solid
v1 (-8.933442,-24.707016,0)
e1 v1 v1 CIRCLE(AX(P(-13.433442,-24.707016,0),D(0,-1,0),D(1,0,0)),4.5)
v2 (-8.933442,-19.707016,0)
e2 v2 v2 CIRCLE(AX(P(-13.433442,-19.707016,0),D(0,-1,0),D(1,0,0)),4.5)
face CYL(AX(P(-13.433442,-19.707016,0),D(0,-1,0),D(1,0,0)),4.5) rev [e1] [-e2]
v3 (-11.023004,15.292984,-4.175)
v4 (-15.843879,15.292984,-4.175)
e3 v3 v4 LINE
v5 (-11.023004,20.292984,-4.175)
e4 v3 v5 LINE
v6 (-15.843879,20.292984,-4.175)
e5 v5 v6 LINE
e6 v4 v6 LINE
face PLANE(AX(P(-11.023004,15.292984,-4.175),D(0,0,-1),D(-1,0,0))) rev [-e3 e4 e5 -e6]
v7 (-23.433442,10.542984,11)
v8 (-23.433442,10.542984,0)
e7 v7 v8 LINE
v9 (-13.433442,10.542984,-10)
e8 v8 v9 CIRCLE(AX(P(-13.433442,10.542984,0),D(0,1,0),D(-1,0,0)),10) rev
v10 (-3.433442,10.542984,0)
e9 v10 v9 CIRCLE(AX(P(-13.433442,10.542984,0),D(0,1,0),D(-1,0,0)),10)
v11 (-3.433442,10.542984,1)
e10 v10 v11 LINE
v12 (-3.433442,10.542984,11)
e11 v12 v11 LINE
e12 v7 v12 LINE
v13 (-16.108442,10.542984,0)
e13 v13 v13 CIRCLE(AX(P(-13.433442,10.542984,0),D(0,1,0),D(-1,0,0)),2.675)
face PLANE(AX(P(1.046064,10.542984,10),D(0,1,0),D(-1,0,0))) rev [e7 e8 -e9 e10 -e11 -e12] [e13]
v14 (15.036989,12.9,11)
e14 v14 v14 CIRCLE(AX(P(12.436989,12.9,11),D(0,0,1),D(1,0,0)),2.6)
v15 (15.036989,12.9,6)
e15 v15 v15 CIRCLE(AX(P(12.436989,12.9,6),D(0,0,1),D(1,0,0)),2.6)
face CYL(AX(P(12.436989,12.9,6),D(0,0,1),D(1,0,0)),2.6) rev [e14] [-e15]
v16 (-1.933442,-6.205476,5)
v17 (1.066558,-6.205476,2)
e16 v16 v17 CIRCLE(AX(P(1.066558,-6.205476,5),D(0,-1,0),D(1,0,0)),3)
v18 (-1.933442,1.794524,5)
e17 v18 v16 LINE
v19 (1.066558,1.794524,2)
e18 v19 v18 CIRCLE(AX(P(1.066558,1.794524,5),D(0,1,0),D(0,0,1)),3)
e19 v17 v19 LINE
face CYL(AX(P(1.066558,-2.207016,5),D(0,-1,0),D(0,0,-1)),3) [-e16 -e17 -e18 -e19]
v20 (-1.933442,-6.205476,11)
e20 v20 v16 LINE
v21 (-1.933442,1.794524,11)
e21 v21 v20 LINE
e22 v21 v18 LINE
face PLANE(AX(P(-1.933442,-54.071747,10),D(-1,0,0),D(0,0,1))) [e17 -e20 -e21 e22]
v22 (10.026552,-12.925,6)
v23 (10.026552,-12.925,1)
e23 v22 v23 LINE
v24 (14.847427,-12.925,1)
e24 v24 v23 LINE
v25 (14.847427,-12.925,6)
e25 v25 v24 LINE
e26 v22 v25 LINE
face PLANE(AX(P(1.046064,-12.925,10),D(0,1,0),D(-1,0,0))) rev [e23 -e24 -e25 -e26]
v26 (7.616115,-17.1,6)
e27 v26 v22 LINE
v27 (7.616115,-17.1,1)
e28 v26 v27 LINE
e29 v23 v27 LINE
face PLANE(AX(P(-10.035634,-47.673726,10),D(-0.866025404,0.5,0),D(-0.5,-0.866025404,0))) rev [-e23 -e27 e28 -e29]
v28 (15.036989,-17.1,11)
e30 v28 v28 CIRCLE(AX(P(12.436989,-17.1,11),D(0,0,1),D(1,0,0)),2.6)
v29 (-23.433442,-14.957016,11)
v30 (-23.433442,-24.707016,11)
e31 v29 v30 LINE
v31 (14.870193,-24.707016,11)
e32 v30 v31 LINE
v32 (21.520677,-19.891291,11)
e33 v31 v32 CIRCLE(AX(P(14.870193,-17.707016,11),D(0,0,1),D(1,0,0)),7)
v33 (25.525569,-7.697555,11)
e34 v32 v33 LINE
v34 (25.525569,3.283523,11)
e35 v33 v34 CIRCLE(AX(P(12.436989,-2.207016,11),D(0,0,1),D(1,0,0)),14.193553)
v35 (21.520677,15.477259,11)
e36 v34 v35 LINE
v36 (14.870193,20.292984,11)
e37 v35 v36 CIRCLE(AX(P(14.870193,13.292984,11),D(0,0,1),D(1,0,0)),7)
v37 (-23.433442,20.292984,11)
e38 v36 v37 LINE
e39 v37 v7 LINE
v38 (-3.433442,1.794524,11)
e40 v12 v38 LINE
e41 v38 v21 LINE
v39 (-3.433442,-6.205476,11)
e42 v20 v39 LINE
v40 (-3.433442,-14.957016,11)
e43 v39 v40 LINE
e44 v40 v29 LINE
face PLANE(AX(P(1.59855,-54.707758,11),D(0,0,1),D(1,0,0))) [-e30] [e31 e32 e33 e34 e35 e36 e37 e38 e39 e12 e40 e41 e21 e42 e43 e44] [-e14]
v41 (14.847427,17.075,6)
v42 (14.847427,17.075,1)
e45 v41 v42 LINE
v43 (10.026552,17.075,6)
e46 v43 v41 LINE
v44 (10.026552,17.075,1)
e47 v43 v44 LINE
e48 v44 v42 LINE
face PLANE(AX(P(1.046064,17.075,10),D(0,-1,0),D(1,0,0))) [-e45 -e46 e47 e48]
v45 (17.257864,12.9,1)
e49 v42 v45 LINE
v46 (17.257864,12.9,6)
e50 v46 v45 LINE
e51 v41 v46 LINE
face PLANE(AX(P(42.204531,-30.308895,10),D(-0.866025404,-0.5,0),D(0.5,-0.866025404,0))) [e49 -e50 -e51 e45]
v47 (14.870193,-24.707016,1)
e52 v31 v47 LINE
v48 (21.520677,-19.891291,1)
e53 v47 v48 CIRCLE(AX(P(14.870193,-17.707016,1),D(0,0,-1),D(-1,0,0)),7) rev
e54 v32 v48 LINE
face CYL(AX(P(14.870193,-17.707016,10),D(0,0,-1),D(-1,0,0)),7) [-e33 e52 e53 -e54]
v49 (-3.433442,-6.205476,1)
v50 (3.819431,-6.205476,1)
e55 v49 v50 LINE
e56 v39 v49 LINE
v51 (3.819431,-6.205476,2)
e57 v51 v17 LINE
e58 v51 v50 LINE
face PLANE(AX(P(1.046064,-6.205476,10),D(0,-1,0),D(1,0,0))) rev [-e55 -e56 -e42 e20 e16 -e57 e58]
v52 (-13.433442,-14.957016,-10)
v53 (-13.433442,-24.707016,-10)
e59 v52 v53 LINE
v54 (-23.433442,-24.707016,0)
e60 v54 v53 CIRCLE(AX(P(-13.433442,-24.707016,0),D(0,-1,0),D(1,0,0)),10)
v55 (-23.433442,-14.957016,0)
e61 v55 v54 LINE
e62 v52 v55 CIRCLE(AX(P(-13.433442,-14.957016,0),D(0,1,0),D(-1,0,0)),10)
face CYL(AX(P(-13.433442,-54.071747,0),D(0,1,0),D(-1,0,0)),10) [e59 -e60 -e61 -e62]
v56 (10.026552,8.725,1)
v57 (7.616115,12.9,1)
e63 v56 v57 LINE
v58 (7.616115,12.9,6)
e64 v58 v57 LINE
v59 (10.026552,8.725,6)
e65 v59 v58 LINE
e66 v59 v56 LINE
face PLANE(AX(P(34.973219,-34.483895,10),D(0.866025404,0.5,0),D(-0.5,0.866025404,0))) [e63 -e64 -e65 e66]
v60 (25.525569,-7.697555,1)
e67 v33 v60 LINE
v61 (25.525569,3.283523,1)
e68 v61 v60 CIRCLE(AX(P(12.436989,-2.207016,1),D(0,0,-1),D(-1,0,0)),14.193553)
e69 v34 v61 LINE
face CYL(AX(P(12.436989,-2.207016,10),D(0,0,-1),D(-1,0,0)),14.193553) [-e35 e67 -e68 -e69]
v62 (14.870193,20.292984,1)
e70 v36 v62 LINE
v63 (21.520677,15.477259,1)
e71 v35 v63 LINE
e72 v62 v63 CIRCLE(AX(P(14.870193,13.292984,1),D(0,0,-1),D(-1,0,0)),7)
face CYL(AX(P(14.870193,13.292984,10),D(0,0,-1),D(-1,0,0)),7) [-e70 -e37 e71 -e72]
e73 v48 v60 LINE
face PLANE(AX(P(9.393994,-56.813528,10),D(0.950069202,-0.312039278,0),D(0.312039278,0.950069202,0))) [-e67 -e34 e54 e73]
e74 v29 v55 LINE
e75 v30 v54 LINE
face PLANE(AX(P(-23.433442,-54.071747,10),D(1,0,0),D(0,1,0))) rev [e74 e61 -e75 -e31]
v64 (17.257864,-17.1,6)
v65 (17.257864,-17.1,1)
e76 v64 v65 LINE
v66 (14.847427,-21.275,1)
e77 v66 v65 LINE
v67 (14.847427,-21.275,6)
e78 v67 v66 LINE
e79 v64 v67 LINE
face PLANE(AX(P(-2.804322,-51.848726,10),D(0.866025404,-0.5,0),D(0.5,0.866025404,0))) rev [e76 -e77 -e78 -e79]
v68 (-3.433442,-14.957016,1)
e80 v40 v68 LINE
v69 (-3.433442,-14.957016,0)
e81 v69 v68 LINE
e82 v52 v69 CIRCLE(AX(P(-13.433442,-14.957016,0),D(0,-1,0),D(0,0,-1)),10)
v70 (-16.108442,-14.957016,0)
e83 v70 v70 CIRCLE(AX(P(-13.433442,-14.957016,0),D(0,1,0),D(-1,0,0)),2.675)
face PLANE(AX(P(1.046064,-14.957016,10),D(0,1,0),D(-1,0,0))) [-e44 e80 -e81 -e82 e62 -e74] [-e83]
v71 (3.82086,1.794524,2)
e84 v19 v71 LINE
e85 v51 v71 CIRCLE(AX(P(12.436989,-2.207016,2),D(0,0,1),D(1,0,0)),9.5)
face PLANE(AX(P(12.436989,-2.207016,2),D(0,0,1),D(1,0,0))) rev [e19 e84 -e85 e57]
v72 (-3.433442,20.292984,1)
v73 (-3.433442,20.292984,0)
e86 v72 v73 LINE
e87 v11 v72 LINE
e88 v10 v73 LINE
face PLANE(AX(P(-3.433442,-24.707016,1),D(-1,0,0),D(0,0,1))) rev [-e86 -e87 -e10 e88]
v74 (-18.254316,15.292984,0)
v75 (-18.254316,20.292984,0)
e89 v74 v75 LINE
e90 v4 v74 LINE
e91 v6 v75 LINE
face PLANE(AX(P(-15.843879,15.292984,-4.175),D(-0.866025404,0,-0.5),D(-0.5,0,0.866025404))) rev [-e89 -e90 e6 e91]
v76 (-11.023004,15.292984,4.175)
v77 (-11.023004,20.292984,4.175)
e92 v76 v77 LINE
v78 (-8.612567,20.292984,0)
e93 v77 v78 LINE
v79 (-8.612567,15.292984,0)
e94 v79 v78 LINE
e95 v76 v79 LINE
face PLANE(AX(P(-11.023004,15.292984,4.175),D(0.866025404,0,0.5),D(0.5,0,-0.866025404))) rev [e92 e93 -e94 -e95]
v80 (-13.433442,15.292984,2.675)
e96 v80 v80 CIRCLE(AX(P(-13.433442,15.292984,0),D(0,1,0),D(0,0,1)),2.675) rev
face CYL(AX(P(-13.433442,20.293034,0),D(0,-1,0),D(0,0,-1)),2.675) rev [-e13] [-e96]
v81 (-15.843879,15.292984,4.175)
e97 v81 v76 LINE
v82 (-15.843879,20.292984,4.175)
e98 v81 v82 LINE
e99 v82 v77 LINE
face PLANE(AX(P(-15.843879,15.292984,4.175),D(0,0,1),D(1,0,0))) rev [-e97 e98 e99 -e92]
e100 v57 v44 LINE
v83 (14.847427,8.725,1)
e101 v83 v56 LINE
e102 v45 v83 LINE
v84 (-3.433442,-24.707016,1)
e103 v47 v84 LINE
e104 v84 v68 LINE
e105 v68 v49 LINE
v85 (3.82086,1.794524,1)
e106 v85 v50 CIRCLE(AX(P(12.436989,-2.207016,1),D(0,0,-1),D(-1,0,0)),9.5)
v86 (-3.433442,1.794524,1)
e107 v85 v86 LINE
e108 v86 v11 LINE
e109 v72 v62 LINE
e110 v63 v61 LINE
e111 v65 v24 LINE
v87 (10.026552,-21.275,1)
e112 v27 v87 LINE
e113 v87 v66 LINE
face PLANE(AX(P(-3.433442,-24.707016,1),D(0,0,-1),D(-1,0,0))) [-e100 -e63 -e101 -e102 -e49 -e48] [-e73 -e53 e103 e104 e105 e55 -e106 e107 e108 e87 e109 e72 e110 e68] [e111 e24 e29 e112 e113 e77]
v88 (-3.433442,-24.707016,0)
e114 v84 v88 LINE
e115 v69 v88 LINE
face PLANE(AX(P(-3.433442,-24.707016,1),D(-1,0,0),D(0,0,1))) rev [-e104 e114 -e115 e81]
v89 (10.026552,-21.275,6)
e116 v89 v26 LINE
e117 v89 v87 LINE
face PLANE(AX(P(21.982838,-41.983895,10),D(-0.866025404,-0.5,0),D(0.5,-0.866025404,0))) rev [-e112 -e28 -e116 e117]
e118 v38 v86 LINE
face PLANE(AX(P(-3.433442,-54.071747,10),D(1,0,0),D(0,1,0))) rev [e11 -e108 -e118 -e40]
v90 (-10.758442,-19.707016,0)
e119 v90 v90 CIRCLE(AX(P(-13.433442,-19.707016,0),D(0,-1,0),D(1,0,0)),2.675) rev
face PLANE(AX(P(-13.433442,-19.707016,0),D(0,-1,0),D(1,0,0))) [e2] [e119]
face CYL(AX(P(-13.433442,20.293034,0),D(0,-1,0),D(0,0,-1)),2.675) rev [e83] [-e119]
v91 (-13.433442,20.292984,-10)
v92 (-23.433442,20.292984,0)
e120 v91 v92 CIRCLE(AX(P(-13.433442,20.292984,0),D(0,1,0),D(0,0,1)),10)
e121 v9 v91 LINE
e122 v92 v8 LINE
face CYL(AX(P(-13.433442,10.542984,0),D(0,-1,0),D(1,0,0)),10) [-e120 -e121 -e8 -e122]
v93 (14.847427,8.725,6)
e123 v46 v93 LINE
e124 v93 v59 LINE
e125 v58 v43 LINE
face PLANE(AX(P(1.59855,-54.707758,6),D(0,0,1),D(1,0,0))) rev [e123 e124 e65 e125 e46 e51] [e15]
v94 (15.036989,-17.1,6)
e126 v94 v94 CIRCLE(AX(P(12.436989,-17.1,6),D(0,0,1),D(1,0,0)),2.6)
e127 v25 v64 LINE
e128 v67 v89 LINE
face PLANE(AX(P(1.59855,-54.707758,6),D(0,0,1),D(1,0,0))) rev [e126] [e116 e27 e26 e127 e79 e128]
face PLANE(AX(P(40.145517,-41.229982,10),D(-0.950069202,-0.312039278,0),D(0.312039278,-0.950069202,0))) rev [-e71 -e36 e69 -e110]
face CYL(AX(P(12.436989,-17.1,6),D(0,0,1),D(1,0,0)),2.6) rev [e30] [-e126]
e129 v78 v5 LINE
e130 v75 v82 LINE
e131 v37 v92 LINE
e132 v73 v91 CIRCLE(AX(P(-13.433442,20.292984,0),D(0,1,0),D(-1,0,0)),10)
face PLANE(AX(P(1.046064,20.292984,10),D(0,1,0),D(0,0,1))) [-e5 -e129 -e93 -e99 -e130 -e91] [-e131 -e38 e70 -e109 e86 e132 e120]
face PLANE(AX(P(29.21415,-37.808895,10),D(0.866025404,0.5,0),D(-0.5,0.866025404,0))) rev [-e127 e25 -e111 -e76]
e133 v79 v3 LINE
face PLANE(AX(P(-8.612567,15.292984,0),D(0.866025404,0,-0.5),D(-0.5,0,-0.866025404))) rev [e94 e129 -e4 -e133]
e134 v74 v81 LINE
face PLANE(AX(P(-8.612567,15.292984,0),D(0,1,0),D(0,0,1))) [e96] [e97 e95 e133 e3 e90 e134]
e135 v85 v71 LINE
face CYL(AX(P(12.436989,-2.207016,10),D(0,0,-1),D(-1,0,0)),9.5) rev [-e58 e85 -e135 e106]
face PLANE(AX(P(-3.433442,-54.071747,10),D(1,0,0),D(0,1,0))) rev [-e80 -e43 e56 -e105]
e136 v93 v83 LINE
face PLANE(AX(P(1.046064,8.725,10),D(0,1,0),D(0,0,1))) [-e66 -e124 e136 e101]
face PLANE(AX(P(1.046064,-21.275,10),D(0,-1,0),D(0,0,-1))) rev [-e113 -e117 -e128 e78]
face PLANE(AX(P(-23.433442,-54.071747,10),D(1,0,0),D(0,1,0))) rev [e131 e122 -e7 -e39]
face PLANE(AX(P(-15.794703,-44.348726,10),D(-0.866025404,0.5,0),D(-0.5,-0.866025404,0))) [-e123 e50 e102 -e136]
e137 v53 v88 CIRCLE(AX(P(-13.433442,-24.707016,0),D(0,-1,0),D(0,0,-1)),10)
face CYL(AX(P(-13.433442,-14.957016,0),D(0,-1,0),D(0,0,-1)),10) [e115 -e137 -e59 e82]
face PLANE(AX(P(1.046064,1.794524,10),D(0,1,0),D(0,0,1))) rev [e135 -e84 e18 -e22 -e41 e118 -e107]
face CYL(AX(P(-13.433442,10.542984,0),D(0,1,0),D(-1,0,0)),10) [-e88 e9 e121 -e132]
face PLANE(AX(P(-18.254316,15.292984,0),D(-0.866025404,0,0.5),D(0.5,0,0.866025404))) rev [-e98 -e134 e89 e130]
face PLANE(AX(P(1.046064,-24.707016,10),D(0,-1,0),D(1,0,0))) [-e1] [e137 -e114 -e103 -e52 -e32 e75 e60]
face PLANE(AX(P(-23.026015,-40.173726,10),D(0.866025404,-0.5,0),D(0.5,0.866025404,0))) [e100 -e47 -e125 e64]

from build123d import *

# Parameters (mm, degrees)
SKETCH1_R           = 9.5
BOSS_EXTRUDE1_DEPTH = 10
BOSS_EXTRUDE4_START = -9.75
BOSS_EXTRUDE4_DEPTH = 9.75
BOSS_EXTRUDE5_DEPTH = 9.75
SKETCH19_R          = 2.675
CUT_EXTRUDE1_DEPTH  = 54.237071403
CUT_EXTRUDE2_DEPTH  = 1
SKETCH21_R          = 9.541498329
BOSS_EXTRUDE6_DEPTH = 8
SKETCH22_W          = 10.184582577
SKETCH22_H          = 8
CUT_EXTRUDE3_DEPTH  = 1
SKETCH24_R          = 2.6
BOSS_EXTRUDE8_DEPTH = 1
SKETCH25_R          = 2.6
BOSS_EXTRUDE9_DEPTH = 5
SKETCH26_R          = 4.5
CUT_EXTRUDE4_DEPTH  = 5
CUT_EXTRUDE5_DEPTH  = 5
FILLET1_R           = 3
FILLET2_R           = 10


with BuildPart() as part:
    # Sketch1 → Boss-Extrude1 (new body)
    with BuildSketch(Plane.XY):
        with BuildLine():
            Line((-23.433441641, -14.957015859), (-23.433441641, -24.707015859))
            Line((-23.433441641, -24.707015859), (14.870192677, -24.707015859))
            ThreePointArc((14.870192677, -24.707015859), (18.975681404, -23.376668609), (21.520677092, -19.891290805))
            Line((21.520677092, -19.891290805), (25.525569024, -7.69755511))
            ThreePointArc((25.525569024, -7.69755511), (26.630542081, -2.207015859), (25.525569024, 3.283523393))
            Line((25.525569024, 3.283523393), (21.520677092, 15.477259087))
            ThreePointArc((21.520677092, 15.477259087), (18.975681404, 18.962636892), (14.870192677, 20.292984141))
            Line((14.870192677, 20.292984141), (-23.433441641, 20.292984141))
            Line((-23.433441641, 20.292984141), (-23.433441641, 10.542984141))
            Line((-23.433441641, 10.542984141), (-3.433441641, 10.542984141))
            Line((-3.433441641, 10.542984141), (-3.433441641, 1.794523598))
            Line((-3.433441641, 1.794523598), (-1.933441641, 1.794523598))
            Line((-1.933441641, 1.794523598), (-1.933441641, -6.205476402))
            Line((-1.933441641, -6.205476402), (-3.433441641, -6.205476402))
            Line((-3.433441641, -6.205476402), (-3.433441641, -14.957015859))
            Line((-3.433441641, -14.957015859), (-23.433441641, -14.957015859))
        make_face()
        with Locations((12.436989349, -2.207015859)):
            Circle(SKETCH1_R, mode=Mode.SUBTRACT)
        Polygon((10.026551975, -12.925000001), (14.847426723, -12.925000001), (17.257864097, -17.100000001), (14.847426723, -21.275000001), (10.026551975, -21.275000001), (7.616114601, -17.100000001), align=None, mode=Mode.SUBTRACT)
        Polygon((14.847426723, 8.724999999), (17.257864097, 12.899999999), (14.847426723, 17.074999999), (10.026551975, 17.074999999), (7.616114601, 12.899999999), (10.026551975, 8.724999999), align=None, mode=Mode.SUBTRACT)
    extrude(amount=BOSS_EXTRUDE1_DEPTH)

    # Sketch2 → Boss-Extrude4 (add)
    with BuildSketch(Plane(origin=(0, 20.292984141, 0), x_dir=(1, 0, 0), z_dir=(0, 1, 0)).offset(BOSS_EXTRUDE4_START)):
        with BuildLine():
            Line((-23.433441641, 0), (-3.433441641, 0))
            ThreePointArc((-3.433441641, 0), (-6.362373829, 7.071067812), (-13.433441641, 10))
            Line((-13.433441641, 10), (-23.433441641, 10))
            Line((-23.433441641, 10), (-23.433441641, 0))
        make_face()
    extrude(amount=BOSS_EXTRUDE4_DEPTH)

    # Sketch18 → Boss-Extrude5 (add)
    with BuildSketch(Plane.XZ.offset(24.707015859)):
        with BuildLine():
            Line((-23.433441641, 0), (-3.433441641, 0))
            ThreePointArc((-3.433441641, 0), (-6.362373829, -7.071067812), (-13.433441641, -10))
            Line((-13.433441641, -10), (-23.433441641, -10))
            Line((-23.433441641, -10), (-23.433441641, 0))
        make_face()
    extrude(amount=-BOSS_EXTRUDE5_DEPTH)

    # Sketch19 → Cut-Extrude1 (cut, through all)
    with BuildSketch(Plane.XZ.offset(24.707015859)):
        with Locations(Location((-13.433441641, 0, 0), (0, 0, 270))):
            Circle(SKETCH19_R)
    extrude(amount=-CUT_EXTRUDE1_DEPTH, mode=Mode.SUBTRACT)

    # Sketch20 → Cut-Extrude2 (cut)
    with BuildSketch(Plane(origin=(0, 0, 0), x_dir=(-1, 0, 0), z_dir=(0, 0, -1))):
        Polygon((3.433441641, -24.707015859), (3.433441641, 20.292984141), (-35.58098809, 20.292984141), (-33.558086905, -24.707015859), align=None)
    extrude(amount=-CUT_EXTRUDE2_DEPTH, mode=Mode.SUBTRACT)

    # Sketch21 → Boss-Extrude6 (add)
    with BuildSketch(Plane.XY.offset(10)):
        with Locations((12.436989349, -2.207015859)):
            Circle(SKETCH21_R)
    extrude(amount=-BOSS_EXTRUDE6_DEPTH)

    # Sketch22 → Cut-Extrude3 (cut)
    with BuildSketch(Plane(origin=(0, 0, 1), x_dir=(-1, 0, 0), z_dir=(0, 0, -1))):
        with Locations((-3.158849648, -2.205476402)):
            Rectangle(SKETCH22_W, SKETCH22_H)
    extrude(amount=-CUT_EXTRUDE3_DEPTH, mode=Mode.SUBTRACT)

    # Sketch24 → Boss-Extrude8 (add)
    # profile 1 of 3: a face of its own
    with BuildSketch(Plane.XY.offset(10)):
        with BuildLine():
            Line((14.870192677, -24.707015859), (-23.433441641, -24.707015859))
            Line((-23.433441641, -24.707015859), (-23.433441641, -14.957015859))
            Line((-23.433441641, -14.957015859), (-3.433441641, -14.957015859))
            Line((-3.433441641, -14.957015859), (-3.433441641, -6.205476402))
            Line((-3.433441641, -6.205476402), (-1.933441641, -6.205476402))
            Line((-1.933441641, -6.205476402), (-1.933441641, 1.794523598))
            Line((-1.933441641, 1.794523598), (-3.433441641, 1.794523598))
            Line((-3.433441641, 1.794523598), (-3.433441641, 10.542984141))
            Line((-3.433441641, 10.542984141), (-23.433441641, 10.542984141))
            Line((-23.433441641, 10.542984141), (-23.433441641, 20.292984141))
            Line((-23.433441641, 20.292984141), (14.870192677, 20.292984141))
            ThreePointArc((14.870192677, 20.292984141), (18.975681404, 18.962636892), (21.520677092, 15.477259087))
            Line((21.520677092, 15.477259087), (25.525569024, 3.283523393))
            ThreePointArc((25.525569024, 3.283523393), (26.630542081, -2.207015859), (25.525569024, -7.69755511))
            Line((25.525569024, -7.69755511), (21.520677092, -19.891290805))
            ThreePointArc((21.520677092, -19.891290805), (18.975681404, -23.376668609), (14.870192677, -24.707015859))
        make_face()
        Polygon((14.847426723, 8.724999999), (17.257864097, 12.899999999), (14.847426723, 17.074999999), (10.026551975, 17.074999999), (7.616114601, 12.899999999), (10.026551975, 8.724999999), align=None, mode=Mode.SUBTRACT)
        Polygon((10.026551975, -12.925000001), (14.847426723, -12.925000001), (17.257864097, -17.100000001), (14.847426723, -21.275000001), (10.026551975, -21.275000001), (7.616114601, -17.100000001), align=None, mode=Mode.SUBTRACT)
    # profile 2 of 3: a face of its own
    with BuildSketch(Plane.XY.offset(10)):
        with Locations((12.436989349, 12.899999999)):
            Circle(SKETCH24_R)
    # profile 3 of 3: a face of its own
    with BuildSketch(Plane.XY.offset(10)):
        with Locations((12.436989349, -17.100000001)):
            Circle(SKETCH24_R)
    extrude(amount=BOSS_EXTRUDE8_DEPTH)


with BuildPart() as boss_extrude8_kept_piece:
    # of the separate pieces the step leaves, the one the design keeps (boss_extrude8_pieces_kept)
    add(part.part.solids().sort_by_distance((-3.433441641, -14.957015859, 0))[0])

    # Sketch25 → Boss-Extrude9 (add)
    # profile 1 of 2: a face of its own
    with BuildSketch(Plane.XY.offset(11)):
        Polygon((10.026551975, 8.724999999), (14.847426723, 8.724999999), (17.257864097, 12.899999999), (14.847426723, 17.074999999), (10.026551975, 17.074999999), (7.616114601, 12.899999999), align=None)
        with Locations((12.436989349, 12.899999999)):
            Circle(SKETCH25_R, mode=Mode.SUBTRACT)
    # profile 2 of 2: a face of its own
    with BuildSketch(Plane.XY.offset(11)):
        Polygon((14.847426723, -12.925000001), (10.026551975, -12.925000001), (7.616114601, -17.100000001), (10.026551975, -21.275000001), (14.847426723, -21.275000001), (17.257864097, -17.100000001), align=None)
        with Locations((12.436989349, -17.100000001)):
            Circle(SKETCH25_R, mode=Mode.SUBTRACT)
    extrude(amount=-BOSS_EXTRUDE9_DEPTH)

    # Sketch26 → Cut-Extrude4 (cut)
    with BuildSketch(Plane.XZ.offset(24.707015859)):
        with Locations((-13.433441641, 0)):
            Circle(SKETCH26_R)
    extrude(amount=-CUT_EXTRUDE4_DEPTH, mode=Mode.SUBTRACT)

    # Sketch27 → Cut-Extrude5 (cut)
    with BuildSketch(Plane(origin=(0, 20.292984141, 0), x_dir=(1, 0, 0), z_dir=(0, 1, 0))):
        Polygon((-8.612566893, 0), (-11.023004267, 4.175), (-15.843879015, 4.175), (-18.254316389, 0), (-15.843879015, -4.175), (-11.023004267, -4.175), align=None)
    extrude(amount=-CUT_EXTRUDE5_DEPTH, mode=Mode.SUBTRACT)

    # Fillet1
    fillet1_edges = [boss_extrude8_kept_piece.edges().sort_by_distance(p)[0] for p in [
        (-1.933441641, -2.205476402, 2),
    ]]
    fillet(fillet1_edges, radius=FILLET1_R)

    # Fillet2
    fillet2_edges = [boss_extrude8_kept_piece.edges().sort_by_distance(p)[0] for p in [
        (-23.433441641, -19.832015859, -10),
        (-23.433441641, 15.417984141, -10),
    ]]
    fillet(fillet2_edges, radius=FILLET2_R - 0.0001)  # a hair under: the kernel refuses the full size


solid = boss_extrude8_kept_piece.part
